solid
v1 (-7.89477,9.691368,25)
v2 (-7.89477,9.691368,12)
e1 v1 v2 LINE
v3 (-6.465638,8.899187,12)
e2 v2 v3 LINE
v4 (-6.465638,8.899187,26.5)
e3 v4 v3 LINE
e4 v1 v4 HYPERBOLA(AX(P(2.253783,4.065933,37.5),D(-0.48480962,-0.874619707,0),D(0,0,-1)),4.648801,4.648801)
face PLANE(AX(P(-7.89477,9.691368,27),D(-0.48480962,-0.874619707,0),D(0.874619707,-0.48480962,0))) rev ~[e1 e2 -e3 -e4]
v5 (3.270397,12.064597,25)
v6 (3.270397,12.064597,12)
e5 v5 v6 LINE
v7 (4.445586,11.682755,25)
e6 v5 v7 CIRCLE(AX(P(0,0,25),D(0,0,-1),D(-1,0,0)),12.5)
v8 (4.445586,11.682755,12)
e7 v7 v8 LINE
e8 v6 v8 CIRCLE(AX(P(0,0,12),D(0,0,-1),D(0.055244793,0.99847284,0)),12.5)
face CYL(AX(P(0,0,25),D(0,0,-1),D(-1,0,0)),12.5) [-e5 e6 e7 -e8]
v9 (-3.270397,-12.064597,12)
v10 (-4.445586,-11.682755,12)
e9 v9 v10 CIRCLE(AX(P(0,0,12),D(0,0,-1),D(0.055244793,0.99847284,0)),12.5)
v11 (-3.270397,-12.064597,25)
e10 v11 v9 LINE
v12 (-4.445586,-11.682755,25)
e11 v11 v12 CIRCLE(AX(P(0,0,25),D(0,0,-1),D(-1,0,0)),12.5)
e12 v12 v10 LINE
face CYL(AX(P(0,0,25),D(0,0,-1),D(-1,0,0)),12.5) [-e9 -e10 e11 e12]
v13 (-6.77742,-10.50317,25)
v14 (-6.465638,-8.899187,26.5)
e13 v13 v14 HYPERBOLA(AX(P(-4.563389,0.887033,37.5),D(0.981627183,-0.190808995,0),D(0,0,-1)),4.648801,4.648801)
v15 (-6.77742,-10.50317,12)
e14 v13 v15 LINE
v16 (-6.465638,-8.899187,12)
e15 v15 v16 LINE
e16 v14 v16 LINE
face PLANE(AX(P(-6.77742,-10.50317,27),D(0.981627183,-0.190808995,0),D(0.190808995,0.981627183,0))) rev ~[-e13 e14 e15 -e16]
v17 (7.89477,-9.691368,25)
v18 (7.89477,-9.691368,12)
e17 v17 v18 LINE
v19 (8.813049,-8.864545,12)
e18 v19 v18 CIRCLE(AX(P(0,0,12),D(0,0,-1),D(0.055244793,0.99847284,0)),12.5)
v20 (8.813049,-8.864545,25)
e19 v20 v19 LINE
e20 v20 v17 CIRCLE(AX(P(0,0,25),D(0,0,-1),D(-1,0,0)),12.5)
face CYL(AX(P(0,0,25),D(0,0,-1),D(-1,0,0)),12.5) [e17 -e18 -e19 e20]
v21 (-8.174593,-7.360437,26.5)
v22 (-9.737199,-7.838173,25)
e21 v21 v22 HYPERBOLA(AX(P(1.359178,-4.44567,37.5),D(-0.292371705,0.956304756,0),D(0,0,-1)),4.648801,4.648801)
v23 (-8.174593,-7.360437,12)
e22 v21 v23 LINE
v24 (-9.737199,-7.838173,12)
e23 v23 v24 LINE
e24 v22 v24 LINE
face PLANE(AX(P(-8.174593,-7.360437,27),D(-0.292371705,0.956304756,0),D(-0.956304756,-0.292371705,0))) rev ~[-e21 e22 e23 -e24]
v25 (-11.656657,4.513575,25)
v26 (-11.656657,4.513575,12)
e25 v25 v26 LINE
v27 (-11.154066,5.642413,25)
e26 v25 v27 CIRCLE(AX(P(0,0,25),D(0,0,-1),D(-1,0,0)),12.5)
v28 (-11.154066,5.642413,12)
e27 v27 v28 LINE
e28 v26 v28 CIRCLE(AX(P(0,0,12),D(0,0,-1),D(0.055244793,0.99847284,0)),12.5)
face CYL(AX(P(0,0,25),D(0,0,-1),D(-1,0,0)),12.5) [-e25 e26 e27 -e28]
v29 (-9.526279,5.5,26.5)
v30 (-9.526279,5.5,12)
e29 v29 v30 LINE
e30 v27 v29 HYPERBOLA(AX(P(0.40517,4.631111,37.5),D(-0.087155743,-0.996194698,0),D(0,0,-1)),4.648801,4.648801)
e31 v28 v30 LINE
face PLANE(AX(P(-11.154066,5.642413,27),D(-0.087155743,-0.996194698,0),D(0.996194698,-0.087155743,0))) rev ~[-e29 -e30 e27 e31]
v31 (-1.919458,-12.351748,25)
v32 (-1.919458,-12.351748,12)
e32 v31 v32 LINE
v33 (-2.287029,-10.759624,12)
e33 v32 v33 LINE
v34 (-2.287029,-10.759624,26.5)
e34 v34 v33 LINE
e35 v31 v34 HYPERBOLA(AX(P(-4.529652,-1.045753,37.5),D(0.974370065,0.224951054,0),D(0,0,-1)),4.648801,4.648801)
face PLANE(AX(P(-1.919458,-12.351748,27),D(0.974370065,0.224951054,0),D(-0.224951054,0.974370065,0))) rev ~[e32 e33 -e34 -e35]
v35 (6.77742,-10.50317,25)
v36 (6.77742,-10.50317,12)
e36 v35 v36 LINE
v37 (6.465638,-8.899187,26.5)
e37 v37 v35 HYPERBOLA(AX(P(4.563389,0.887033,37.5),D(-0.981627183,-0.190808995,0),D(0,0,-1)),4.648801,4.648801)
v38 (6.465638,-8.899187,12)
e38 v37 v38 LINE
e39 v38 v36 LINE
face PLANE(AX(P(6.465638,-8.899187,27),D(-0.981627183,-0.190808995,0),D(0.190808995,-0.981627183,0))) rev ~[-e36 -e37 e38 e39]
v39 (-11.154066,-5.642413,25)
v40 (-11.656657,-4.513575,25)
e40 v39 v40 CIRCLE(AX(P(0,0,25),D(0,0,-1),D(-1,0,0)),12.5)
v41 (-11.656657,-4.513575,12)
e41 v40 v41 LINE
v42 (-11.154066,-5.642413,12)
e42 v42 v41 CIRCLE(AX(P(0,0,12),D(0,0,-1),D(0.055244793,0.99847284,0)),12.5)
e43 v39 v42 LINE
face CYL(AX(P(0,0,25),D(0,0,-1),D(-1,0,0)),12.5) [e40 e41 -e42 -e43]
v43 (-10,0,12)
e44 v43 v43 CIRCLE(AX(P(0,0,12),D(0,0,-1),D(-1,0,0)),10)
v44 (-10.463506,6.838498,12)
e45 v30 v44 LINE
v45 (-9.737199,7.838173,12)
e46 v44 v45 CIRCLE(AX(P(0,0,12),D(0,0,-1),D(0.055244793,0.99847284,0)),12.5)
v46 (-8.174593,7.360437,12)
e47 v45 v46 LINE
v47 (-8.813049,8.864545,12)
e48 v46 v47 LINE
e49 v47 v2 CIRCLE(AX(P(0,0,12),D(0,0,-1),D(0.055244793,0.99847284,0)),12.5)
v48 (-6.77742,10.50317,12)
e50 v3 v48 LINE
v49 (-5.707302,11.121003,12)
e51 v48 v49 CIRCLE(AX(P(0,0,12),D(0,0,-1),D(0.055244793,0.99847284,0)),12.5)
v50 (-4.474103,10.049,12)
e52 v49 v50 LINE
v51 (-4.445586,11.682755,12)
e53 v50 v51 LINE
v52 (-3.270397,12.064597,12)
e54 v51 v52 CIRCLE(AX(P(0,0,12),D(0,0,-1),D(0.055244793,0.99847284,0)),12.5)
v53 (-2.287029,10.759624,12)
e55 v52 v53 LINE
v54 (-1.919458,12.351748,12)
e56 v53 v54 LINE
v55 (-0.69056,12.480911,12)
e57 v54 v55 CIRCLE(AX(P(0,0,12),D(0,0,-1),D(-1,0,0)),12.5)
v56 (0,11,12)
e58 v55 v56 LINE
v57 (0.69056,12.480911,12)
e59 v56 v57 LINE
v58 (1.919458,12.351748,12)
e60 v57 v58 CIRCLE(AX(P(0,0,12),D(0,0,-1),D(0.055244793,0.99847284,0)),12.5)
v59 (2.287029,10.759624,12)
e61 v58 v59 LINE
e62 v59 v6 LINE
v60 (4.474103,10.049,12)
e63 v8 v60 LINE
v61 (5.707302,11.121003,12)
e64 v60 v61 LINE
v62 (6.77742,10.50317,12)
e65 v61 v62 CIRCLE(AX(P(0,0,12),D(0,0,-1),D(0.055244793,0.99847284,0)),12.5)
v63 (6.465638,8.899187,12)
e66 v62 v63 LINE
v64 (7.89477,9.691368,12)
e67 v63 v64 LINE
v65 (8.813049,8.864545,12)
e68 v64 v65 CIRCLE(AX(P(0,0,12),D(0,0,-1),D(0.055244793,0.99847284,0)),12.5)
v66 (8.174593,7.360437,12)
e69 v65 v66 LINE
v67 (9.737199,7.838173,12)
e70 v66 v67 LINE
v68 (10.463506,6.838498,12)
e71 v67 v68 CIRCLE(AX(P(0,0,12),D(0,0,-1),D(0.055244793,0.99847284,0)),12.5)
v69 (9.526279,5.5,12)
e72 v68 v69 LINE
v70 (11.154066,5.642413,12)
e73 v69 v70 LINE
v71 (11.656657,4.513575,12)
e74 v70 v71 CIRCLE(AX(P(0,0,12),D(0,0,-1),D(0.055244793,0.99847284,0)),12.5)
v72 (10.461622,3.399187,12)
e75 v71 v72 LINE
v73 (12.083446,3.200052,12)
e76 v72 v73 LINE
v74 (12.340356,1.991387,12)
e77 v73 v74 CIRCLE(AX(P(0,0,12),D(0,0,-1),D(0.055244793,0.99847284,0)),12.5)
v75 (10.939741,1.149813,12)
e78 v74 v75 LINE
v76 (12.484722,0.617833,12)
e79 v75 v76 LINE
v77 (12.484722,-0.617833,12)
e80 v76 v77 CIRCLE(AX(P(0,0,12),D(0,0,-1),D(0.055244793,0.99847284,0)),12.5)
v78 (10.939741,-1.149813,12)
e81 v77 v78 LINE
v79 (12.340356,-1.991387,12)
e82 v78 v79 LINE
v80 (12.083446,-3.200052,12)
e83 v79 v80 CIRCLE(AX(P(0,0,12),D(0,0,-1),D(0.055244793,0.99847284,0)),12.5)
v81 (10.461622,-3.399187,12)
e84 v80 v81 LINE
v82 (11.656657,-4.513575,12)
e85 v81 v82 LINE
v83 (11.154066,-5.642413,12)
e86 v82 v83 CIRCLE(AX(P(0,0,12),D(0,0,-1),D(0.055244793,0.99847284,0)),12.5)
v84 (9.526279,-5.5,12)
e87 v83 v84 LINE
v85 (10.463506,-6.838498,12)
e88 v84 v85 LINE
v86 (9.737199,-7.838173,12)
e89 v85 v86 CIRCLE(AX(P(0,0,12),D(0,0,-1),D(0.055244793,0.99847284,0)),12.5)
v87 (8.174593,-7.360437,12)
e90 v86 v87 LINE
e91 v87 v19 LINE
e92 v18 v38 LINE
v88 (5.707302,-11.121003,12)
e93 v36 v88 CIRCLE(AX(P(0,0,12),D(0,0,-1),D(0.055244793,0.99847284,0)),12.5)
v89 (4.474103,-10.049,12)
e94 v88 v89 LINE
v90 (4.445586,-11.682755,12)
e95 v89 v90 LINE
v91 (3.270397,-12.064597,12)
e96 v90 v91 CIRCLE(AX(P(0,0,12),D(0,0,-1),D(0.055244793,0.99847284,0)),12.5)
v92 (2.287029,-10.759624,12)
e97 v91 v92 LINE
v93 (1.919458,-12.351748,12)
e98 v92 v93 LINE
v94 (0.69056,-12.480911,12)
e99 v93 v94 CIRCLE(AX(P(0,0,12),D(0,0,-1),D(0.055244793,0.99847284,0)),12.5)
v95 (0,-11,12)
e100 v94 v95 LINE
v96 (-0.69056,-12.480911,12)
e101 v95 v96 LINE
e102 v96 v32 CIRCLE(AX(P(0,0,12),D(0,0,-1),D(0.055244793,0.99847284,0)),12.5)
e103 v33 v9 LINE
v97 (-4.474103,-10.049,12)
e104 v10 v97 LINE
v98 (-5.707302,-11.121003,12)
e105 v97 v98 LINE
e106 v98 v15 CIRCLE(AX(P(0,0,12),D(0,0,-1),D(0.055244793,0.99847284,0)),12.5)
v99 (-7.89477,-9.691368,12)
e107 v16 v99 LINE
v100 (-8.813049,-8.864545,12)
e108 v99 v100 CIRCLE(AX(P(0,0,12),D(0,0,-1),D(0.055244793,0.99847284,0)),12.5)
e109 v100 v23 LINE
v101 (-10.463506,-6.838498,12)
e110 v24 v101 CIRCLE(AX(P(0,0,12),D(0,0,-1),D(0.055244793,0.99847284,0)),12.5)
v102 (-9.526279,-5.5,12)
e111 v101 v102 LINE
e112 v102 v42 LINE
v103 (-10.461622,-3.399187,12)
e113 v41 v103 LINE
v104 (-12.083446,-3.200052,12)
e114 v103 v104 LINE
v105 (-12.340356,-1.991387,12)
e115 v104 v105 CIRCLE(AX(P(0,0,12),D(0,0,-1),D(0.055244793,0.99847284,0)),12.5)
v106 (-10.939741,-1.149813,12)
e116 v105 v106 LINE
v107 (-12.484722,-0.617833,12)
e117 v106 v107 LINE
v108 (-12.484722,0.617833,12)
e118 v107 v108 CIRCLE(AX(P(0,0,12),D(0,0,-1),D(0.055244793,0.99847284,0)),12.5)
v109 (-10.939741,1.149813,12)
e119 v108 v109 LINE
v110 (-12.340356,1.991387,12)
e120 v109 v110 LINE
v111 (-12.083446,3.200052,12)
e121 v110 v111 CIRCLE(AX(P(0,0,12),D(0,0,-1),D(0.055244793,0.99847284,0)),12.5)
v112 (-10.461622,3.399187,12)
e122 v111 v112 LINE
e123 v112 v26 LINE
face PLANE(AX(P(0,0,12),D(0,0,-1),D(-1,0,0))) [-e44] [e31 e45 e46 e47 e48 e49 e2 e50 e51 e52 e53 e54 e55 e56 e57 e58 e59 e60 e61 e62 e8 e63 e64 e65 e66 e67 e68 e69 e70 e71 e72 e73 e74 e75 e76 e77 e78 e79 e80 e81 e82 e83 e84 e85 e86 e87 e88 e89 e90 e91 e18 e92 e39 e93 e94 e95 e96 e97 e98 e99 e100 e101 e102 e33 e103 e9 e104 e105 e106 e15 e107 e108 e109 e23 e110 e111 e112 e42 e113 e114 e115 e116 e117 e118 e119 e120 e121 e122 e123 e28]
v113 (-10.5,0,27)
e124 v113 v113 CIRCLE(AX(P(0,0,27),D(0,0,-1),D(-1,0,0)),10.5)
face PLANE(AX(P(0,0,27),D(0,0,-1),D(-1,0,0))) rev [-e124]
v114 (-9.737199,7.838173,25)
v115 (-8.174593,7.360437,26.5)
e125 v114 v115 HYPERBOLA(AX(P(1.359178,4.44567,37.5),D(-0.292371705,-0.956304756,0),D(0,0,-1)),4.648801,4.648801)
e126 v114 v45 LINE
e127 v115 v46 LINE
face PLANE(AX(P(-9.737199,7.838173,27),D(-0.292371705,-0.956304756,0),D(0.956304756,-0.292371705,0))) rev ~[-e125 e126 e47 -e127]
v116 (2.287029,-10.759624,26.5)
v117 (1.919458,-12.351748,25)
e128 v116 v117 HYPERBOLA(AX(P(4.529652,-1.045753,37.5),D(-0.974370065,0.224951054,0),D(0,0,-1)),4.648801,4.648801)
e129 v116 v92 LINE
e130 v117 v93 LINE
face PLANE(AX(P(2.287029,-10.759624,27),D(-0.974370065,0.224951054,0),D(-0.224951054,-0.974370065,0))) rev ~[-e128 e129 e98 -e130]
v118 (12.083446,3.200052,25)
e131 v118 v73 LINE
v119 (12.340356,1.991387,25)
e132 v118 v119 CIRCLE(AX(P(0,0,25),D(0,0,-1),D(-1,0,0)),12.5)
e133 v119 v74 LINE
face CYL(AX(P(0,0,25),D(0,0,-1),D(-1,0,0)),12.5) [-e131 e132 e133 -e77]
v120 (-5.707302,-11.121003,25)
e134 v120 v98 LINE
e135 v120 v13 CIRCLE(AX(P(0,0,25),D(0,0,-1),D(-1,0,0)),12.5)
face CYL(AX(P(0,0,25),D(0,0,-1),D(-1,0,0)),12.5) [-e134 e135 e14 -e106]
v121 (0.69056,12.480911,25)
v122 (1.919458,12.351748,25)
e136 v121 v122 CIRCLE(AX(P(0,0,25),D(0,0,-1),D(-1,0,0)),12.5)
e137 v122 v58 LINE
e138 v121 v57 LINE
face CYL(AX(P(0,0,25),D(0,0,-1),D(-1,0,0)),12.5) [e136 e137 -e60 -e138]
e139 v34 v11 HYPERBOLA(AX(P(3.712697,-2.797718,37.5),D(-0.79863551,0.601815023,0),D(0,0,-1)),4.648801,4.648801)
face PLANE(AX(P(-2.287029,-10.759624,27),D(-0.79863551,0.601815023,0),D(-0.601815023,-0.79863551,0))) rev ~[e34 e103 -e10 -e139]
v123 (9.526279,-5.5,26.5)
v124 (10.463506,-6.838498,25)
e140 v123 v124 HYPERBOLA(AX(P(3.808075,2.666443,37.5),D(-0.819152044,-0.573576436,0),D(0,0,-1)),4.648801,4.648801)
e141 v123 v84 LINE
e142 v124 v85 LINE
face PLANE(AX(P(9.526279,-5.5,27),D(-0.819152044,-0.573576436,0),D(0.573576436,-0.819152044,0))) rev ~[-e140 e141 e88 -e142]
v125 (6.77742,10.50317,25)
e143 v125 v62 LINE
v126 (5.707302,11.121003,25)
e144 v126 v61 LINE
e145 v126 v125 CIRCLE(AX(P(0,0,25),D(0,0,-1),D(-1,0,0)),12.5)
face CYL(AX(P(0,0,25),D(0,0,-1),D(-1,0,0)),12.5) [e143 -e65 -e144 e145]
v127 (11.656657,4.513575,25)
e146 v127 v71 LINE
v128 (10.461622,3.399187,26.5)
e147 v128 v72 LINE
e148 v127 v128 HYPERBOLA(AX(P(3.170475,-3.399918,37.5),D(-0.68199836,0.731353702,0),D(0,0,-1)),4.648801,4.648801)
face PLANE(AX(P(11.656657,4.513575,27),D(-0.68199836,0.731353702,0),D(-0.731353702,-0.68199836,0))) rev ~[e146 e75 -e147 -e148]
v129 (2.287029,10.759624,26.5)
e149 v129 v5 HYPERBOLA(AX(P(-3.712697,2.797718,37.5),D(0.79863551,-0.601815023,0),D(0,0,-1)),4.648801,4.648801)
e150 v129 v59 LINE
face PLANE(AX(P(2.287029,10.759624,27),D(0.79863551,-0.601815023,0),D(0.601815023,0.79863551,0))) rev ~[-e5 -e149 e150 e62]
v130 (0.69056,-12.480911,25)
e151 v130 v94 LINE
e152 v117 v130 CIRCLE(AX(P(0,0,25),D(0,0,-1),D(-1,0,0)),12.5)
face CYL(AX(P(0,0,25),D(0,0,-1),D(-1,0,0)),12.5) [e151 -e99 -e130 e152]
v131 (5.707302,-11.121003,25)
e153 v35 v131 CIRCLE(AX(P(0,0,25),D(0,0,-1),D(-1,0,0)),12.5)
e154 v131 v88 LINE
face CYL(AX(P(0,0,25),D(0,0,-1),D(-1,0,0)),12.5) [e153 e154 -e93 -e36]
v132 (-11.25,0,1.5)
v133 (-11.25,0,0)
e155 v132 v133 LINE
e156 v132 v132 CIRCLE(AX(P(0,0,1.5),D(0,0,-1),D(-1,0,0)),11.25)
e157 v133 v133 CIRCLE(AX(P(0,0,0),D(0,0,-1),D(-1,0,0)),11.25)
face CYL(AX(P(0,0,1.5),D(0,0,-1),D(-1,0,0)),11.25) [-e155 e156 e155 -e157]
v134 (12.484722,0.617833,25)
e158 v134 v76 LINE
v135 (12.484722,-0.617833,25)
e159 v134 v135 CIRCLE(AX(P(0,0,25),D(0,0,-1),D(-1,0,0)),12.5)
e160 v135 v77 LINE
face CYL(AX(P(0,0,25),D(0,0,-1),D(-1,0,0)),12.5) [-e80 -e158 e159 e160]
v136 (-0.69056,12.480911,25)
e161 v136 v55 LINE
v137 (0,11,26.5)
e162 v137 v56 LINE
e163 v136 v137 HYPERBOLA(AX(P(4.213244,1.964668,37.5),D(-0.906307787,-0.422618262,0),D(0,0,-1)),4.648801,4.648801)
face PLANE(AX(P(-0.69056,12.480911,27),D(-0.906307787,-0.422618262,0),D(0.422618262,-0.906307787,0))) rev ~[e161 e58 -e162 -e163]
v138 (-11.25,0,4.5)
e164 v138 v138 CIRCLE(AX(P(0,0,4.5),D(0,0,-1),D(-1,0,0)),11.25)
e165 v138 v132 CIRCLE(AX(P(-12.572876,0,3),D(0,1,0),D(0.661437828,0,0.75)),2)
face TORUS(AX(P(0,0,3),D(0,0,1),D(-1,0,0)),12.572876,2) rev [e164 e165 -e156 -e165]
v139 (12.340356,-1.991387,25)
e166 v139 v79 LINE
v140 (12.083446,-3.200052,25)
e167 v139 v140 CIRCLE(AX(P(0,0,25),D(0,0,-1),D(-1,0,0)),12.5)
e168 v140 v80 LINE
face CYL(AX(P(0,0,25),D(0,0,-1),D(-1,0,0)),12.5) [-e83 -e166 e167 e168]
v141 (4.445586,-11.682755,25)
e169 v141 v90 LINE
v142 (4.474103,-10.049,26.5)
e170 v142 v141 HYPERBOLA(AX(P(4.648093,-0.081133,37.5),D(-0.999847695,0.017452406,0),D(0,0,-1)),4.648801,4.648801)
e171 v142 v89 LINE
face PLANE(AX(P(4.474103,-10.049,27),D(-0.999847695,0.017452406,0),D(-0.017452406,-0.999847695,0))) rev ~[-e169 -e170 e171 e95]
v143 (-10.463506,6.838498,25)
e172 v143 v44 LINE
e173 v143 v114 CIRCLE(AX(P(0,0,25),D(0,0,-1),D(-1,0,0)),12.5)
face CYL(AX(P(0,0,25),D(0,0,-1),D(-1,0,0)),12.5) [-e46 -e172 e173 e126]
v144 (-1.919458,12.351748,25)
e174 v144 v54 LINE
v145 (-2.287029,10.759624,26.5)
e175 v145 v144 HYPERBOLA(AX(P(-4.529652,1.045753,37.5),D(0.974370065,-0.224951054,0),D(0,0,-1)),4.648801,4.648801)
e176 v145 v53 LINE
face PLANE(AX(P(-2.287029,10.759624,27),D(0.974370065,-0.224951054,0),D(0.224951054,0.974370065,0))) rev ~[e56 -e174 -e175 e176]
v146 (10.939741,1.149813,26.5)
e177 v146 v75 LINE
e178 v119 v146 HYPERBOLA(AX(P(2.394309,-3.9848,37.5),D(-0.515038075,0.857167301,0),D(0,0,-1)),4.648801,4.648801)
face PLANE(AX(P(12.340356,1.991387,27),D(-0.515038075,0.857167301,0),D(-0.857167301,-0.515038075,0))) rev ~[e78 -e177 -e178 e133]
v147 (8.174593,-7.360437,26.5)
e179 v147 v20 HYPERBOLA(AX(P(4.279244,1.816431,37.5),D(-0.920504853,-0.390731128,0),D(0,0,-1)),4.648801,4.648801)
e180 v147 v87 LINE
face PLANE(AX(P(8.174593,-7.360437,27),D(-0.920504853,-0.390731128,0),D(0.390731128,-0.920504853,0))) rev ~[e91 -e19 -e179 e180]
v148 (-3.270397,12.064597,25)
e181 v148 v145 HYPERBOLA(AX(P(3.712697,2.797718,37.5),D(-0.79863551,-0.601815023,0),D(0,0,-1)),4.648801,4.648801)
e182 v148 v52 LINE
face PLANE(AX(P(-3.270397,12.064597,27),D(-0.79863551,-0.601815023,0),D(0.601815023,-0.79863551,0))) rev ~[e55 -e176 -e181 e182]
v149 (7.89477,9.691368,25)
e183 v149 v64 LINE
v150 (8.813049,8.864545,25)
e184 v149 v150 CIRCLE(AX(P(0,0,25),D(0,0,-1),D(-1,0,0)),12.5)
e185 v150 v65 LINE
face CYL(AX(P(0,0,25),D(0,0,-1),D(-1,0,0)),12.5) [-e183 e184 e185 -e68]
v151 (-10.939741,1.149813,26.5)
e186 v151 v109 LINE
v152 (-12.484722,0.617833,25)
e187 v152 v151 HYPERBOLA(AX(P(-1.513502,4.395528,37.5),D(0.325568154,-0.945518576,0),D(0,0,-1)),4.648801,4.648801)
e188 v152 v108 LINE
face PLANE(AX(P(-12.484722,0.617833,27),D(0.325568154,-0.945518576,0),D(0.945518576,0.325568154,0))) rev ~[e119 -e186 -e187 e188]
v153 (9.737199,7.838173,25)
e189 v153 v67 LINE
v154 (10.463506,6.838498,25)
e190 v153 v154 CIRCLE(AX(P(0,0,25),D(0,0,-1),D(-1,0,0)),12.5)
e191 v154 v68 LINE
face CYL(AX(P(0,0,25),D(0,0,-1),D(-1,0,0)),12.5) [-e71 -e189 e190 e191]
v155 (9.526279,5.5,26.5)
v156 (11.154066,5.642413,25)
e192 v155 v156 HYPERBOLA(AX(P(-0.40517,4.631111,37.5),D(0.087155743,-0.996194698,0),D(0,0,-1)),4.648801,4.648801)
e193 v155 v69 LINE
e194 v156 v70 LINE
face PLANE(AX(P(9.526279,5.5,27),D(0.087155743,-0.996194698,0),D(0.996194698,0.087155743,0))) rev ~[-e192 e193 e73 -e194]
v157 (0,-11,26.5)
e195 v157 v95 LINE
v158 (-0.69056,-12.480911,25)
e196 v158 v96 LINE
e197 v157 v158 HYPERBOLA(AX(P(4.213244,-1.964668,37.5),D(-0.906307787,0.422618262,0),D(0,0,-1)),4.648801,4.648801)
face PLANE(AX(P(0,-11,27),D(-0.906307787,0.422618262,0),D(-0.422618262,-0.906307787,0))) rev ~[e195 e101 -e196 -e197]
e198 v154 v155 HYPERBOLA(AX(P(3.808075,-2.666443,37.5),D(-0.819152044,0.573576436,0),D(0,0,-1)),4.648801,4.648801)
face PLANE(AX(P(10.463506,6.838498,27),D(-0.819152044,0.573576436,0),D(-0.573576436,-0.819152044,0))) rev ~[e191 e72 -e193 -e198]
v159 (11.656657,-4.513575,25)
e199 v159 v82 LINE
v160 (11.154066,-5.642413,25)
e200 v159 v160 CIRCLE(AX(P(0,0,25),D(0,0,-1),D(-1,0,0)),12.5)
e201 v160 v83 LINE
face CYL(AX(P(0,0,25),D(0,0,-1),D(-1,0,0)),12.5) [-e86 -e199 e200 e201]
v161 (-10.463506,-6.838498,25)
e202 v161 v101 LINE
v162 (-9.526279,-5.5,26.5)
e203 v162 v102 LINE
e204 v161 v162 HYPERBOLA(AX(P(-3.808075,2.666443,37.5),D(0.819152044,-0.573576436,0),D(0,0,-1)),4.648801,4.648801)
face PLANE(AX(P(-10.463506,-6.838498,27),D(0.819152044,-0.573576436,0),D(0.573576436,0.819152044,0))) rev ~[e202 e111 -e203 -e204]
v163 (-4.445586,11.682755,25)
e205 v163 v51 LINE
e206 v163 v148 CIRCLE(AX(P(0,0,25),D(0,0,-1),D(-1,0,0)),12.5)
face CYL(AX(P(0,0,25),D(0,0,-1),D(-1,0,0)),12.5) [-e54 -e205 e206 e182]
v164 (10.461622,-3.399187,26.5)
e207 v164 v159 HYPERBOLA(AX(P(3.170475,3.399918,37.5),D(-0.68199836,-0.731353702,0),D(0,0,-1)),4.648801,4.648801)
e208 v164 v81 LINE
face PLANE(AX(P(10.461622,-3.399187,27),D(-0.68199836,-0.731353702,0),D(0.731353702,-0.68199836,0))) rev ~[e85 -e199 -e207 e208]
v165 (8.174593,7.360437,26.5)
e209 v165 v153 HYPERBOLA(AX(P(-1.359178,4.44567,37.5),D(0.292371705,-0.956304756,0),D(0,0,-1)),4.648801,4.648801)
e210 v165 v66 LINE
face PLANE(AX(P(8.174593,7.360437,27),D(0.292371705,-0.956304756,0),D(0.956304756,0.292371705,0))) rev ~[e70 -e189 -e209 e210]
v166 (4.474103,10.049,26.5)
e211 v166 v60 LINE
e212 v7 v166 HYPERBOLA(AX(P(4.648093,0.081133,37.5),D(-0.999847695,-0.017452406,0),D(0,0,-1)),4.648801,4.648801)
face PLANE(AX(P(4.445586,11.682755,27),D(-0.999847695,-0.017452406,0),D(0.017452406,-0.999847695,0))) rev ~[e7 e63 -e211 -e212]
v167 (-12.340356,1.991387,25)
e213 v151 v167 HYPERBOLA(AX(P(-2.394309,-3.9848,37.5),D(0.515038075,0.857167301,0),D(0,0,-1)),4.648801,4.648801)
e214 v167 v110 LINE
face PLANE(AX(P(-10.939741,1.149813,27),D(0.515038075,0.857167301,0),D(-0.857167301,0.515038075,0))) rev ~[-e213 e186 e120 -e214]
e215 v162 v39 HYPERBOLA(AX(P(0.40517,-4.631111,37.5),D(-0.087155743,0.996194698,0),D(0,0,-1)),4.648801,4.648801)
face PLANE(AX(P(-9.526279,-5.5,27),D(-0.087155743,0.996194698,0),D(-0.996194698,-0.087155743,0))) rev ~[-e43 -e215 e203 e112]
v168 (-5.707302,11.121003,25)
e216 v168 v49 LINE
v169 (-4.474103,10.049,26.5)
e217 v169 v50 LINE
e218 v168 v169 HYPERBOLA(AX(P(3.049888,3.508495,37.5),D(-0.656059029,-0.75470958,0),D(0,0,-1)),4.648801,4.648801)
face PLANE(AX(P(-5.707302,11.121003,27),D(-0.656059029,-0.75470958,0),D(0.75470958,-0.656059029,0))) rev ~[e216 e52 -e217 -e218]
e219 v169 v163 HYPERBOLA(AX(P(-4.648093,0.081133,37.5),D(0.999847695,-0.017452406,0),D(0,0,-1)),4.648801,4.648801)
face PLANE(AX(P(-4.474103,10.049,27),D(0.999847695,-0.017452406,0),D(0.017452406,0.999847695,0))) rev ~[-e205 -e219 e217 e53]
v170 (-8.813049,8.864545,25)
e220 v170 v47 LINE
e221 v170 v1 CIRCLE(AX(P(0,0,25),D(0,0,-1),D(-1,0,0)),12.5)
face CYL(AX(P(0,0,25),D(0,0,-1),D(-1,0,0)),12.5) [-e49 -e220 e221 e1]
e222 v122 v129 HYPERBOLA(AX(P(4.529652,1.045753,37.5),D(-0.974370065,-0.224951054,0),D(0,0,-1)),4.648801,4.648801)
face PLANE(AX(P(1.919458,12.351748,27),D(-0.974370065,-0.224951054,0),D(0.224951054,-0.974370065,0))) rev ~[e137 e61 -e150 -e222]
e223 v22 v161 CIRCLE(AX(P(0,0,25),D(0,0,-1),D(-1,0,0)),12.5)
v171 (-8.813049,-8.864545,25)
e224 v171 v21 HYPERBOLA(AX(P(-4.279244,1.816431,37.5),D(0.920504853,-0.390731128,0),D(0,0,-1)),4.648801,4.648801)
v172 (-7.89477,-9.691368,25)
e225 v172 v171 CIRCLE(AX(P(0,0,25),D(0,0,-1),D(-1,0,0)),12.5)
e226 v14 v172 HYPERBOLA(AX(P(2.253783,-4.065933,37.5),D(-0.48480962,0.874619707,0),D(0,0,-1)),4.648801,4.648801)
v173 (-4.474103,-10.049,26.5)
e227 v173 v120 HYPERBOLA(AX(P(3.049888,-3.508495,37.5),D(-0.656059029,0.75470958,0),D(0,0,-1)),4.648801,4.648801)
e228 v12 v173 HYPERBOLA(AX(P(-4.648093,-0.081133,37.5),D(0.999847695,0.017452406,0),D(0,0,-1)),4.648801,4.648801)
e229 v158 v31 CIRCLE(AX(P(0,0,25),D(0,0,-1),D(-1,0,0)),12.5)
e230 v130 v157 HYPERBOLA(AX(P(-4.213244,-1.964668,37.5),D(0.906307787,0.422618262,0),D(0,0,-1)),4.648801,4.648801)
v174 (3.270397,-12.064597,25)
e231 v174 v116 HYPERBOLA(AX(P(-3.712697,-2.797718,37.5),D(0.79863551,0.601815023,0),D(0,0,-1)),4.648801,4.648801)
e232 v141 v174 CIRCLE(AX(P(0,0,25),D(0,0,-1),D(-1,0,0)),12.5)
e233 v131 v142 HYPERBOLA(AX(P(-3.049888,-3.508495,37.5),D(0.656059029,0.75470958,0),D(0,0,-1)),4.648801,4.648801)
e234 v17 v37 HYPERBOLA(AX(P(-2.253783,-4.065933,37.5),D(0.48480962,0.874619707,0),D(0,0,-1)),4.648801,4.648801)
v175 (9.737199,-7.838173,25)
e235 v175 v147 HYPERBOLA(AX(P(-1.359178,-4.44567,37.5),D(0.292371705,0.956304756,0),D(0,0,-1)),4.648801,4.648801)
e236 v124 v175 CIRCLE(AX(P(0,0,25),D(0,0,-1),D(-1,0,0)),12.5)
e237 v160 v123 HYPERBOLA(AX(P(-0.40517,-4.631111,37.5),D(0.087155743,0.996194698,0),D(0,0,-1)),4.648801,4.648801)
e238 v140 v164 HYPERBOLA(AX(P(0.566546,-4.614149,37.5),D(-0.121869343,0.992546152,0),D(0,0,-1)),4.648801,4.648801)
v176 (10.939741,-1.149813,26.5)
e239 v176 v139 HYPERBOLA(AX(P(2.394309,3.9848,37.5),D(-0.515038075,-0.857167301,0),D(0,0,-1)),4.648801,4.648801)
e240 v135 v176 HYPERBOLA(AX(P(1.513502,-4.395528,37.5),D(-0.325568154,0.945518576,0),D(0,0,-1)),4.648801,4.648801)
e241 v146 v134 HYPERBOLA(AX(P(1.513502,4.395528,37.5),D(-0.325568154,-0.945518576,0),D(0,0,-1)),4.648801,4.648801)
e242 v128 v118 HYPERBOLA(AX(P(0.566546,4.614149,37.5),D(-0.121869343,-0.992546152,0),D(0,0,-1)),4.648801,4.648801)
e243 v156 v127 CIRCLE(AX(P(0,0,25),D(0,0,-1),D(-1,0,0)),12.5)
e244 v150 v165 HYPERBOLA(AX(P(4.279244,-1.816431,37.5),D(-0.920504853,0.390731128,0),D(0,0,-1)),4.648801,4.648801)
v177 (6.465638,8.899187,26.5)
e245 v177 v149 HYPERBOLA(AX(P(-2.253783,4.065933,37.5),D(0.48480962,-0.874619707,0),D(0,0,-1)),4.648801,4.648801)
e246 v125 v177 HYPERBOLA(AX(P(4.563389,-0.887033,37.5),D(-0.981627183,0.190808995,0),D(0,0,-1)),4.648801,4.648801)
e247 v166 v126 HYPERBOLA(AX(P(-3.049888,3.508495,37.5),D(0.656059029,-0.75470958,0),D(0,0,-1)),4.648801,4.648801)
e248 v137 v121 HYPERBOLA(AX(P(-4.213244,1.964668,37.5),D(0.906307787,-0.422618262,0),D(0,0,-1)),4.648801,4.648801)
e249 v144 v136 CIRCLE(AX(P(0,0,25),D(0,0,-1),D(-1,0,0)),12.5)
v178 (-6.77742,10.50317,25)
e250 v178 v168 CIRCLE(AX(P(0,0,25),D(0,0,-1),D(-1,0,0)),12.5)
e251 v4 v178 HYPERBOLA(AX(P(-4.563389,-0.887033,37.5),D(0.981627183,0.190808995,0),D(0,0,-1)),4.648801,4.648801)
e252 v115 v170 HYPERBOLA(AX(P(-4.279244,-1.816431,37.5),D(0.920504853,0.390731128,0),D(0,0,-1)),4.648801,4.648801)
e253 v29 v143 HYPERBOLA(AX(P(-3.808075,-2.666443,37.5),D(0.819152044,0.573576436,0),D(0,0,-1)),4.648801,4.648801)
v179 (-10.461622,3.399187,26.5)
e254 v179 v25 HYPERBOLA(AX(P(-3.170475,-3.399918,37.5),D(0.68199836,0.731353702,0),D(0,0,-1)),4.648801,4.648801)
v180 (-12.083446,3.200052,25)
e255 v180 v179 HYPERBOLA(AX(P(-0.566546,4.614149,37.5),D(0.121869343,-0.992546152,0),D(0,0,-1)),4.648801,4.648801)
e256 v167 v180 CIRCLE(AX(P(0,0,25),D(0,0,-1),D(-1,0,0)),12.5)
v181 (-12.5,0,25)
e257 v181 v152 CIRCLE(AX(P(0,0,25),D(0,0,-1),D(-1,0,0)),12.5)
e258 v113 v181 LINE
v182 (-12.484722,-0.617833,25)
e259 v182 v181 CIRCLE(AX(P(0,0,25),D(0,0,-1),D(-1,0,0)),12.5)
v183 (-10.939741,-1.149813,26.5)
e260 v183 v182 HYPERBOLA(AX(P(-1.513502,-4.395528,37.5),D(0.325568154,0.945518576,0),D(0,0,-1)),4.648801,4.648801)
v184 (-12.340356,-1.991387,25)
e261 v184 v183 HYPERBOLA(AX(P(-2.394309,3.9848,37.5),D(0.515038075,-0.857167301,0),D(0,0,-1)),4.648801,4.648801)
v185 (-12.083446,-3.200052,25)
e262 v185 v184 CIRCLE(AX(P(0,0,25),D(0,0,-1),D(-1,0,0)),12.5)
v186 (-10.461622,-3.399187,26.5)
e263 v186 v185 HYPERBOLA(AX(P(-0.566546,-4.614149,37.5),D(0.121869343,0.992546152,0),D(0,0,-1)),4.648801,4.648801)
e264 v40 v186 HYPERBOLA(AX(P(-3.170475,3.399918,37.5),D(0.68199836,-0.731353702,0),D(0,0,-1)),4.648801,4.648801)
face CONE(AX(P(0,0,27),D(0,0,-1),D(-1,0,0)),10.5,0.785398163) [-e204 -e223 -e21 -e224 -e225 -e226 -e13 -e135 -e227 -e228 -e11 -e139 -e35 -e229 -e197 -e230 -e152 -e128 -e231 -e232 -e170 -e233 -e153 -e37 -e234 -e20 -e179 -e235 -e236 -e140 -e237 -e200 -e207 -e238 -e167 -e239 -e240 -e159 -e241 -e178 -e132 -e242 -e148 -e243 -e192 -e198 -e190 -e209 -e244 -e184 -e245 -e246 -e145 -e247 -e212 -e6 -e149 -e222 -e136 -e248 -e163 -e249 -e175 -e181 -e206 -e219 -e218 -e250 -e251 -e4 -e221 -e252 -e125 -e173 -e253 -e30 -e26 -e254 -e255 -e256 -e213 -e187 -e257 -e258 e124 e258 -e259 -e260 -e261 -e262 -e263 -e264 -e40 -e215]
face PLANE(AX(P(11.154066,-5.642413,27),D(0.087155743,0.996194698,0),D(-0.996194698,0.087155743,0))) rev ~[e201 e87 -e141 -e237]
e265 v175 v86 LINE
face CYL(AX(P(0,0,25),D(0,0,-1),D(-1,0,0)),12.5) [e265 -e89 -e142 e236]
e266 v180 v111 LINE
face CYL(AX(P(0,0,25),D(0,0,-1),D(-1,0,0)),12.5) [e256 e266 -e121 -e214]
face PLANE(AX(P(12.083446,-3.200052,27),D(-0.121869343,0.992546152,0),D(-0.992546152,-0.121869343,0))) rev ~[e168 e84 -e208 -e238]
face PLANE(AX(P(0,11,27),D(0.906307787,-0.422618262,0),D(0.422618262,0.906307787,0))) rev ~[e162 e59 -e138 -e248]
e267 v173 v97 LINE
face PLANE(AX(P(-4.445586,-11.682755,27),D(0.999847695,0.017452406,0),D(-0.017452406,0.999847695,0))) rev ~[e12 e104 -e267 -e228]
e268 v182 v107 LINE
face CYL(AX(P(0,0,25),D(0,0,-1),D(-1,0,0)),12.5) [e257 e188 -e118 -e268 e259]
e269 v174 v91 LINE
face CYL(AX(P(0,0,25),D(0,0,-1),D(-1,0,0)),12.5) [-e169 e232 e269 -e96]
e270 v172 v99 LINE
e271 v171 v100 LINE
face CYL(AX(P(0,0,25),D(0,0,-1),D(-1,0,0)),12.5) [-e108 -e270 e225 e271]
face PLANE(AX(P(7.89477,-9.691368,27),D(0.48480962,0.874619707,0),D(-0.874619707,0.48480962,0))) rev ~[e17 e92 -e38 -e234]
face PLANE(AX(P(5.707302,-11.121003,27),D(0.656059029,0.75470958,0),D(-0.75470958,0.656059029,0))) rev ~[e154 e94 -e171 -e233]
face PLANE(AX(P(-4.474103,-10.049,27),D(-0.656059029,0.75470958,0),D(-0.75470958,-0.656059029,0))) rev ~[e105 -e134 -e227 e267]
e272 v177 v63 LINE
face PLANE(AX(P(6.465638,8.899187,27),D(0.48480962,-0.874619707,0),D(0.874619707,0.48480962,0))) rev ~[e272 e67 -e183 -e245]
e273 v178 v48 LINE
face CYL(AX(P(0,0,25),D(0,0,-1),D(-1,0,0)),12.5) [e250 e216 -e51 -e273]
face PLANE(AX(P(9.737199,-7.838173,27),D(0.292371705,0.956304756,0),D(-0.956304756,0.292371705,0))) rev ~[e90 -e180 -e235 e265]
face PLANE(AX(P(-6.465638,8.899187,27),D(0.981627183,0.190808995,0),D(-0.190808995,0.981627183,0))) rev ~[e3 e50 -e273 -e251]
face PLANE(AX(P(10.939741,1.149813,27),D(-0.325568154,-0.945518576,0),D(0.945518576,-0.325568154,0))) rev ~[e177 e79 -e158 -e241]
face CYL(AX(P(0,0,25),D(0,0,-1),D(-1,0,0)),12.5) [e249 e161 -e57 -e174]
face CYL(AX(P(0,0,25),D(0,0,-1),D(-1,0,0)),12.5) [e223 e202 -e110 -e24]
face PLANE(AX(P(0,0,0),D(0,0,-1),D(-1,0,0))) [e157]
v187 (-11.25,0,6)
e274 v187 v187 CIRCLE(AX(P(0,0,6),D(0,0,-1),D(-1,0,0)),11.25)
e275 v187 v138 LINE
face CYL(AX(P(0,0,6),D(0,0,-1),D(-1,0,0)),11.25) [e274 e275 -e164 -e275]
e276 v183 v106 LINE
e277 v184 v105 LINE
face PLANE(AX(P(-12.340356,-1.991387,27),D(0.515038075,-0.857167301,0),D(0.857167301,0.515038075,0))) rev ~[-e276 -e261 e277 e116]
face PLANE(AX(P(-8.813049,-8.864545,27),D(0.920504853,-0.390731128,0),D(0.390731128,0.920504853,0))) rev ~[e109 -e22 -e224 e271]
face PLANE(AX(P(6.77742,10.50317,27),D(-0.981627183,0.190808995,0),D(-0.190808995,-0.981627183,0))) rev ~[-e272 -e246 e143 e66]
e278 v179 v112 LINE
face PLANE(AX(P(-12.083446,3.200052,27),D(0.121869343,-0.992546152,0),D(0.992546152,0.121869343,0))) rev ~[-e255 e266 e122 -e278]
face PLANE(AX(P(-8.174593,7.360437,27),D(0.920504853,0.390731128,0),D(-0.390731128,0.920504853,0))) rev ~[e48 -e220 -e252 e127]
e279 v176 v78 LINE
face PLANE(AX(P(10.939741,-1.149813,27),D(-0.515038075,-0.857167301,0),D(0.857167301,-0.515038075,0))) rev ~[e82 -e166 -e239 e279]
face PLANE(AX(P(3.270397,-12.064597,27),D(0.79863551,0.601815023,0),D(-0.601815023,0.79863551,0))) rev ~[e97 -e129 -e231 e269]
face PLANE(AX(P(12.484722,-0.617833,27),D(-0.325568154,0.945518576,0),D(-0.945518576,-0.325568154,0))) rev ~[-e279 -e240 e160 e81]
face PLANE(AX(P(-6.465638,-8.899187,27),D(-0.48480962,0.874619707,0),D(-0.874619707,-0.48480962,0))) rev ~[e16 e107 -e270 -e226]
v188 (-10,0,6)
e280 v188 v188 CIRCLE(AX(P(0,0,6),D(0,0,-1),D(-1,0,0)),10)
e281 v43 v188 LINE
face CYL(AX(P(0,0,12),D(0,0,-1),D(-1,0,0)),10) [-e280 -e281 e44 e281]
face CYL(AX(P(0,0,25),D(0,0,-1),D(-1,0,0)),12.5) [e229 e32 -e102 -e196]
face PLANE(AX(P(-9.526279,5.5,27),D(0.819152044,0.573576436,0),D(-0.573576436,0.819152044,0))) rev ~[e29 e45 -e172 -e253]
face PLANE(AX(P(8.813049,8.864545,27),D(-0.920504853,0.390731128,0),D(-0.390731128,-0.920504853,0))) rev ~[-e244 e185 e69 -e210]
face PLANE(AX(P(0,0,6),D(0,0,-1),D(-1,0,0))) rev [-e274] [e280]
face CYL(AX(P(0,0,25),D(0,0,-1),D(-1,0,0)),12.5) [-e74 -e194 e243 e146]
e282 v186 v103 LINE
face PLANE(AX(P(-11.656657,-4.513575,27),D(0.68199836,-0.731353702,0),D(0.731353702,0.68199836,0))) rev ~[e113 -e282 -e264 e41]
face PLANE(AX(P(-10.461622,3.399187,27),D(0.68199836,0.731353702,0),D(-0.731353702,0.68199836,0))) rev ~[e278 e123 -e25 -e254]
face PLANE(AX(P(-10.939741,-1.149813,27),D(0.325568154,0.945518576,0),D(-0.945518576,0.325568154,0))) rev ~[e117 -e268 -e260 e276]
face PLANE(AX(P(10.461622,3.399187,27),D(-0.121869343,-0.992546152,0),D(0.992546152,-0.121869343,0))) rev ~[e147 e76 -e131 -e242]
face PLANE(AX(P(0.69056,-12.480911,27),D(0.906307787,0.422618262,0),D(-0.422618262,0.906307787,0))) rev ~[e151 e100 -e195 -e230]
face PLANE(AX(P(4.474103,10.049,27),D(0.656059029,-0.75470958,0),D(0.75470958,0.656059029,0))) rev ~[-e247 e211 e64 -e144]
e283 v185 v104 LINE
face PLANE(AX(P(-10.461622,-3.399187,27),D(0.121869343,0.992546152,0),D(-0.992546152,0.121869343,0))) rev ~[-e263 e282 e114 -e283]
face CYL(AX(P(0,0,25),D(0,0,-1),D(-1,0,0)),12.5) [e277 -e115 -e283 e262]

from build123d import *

# Parameters (mm, degrees)
F5_DEPTH        = 15
F5_COPIES_COUNT = 30


# Not quite as in the source:
# - a feature of the source that left no trace in its solid (it failed there, or was rolled back) is left out
# - a pattern or mirror of a feature is missing from the dataset's text; its kind, count and spacing are read off the source's solid


with BuildPart() as f3:
    # F2 (on Front) → F3 (revolve)
    with BuildSketch(Plane.XZ):
        with BuildLine():
            Line((-11.25, 0), (0, 0))
            Line((0, 0), (0, 27))
            Line((0, 27), (-10.5, 27))
            Line((-10.5, 27), (-12.5, 25))
            Line((-12.5, 25), (-12.5, 12))
            Line((-12.5, 12), (-10, 12))
            Line((-10, 12), (-10, 6))
            Line((-10, 6), (-11.25, 6))
            Line((-11.25, 6), (-11.25, 4.5))
            ThreePointArc((-11.25, 4.5), (-10.5728756555, 3), (-11.25, 1.5))
            Line((-11.25, 1.5), (-11.25, 0))
        make_face()
    revolve(axis=Axis((0, 0, 13.5), (0, 0, -1)))

    # F4 (on face) → F5 (cut)
    with BuildSketch(Plane.XY.offset(27)):
        with BuildLine():
            Line((0, 11), (0.6905599091, 12.4809105041))
            ThreePointArc((0.6905599091, 12.4809105041), (0, 12.5), (-0.6905599091, 12.4809105041))
            Line((-0.6905599091, 12.4809105041), (0, 11))
        make_face()
    f5 = extrude(amount=-F5_DEPTH, mode=Mode.SUBTRACT)

    # F5_copies: F5 ×30 about axis
    f5_copies_axis = Axis((0, 0, 0), (0, 0, 1))
    for i in range(1, F5_COPIES_COUNT):
        add(f5.rotate(f5_copies_axis, i * 360 / F5_COPIES_COUNT), mode=Mode.SUBTRACT)


solid = f3.part
